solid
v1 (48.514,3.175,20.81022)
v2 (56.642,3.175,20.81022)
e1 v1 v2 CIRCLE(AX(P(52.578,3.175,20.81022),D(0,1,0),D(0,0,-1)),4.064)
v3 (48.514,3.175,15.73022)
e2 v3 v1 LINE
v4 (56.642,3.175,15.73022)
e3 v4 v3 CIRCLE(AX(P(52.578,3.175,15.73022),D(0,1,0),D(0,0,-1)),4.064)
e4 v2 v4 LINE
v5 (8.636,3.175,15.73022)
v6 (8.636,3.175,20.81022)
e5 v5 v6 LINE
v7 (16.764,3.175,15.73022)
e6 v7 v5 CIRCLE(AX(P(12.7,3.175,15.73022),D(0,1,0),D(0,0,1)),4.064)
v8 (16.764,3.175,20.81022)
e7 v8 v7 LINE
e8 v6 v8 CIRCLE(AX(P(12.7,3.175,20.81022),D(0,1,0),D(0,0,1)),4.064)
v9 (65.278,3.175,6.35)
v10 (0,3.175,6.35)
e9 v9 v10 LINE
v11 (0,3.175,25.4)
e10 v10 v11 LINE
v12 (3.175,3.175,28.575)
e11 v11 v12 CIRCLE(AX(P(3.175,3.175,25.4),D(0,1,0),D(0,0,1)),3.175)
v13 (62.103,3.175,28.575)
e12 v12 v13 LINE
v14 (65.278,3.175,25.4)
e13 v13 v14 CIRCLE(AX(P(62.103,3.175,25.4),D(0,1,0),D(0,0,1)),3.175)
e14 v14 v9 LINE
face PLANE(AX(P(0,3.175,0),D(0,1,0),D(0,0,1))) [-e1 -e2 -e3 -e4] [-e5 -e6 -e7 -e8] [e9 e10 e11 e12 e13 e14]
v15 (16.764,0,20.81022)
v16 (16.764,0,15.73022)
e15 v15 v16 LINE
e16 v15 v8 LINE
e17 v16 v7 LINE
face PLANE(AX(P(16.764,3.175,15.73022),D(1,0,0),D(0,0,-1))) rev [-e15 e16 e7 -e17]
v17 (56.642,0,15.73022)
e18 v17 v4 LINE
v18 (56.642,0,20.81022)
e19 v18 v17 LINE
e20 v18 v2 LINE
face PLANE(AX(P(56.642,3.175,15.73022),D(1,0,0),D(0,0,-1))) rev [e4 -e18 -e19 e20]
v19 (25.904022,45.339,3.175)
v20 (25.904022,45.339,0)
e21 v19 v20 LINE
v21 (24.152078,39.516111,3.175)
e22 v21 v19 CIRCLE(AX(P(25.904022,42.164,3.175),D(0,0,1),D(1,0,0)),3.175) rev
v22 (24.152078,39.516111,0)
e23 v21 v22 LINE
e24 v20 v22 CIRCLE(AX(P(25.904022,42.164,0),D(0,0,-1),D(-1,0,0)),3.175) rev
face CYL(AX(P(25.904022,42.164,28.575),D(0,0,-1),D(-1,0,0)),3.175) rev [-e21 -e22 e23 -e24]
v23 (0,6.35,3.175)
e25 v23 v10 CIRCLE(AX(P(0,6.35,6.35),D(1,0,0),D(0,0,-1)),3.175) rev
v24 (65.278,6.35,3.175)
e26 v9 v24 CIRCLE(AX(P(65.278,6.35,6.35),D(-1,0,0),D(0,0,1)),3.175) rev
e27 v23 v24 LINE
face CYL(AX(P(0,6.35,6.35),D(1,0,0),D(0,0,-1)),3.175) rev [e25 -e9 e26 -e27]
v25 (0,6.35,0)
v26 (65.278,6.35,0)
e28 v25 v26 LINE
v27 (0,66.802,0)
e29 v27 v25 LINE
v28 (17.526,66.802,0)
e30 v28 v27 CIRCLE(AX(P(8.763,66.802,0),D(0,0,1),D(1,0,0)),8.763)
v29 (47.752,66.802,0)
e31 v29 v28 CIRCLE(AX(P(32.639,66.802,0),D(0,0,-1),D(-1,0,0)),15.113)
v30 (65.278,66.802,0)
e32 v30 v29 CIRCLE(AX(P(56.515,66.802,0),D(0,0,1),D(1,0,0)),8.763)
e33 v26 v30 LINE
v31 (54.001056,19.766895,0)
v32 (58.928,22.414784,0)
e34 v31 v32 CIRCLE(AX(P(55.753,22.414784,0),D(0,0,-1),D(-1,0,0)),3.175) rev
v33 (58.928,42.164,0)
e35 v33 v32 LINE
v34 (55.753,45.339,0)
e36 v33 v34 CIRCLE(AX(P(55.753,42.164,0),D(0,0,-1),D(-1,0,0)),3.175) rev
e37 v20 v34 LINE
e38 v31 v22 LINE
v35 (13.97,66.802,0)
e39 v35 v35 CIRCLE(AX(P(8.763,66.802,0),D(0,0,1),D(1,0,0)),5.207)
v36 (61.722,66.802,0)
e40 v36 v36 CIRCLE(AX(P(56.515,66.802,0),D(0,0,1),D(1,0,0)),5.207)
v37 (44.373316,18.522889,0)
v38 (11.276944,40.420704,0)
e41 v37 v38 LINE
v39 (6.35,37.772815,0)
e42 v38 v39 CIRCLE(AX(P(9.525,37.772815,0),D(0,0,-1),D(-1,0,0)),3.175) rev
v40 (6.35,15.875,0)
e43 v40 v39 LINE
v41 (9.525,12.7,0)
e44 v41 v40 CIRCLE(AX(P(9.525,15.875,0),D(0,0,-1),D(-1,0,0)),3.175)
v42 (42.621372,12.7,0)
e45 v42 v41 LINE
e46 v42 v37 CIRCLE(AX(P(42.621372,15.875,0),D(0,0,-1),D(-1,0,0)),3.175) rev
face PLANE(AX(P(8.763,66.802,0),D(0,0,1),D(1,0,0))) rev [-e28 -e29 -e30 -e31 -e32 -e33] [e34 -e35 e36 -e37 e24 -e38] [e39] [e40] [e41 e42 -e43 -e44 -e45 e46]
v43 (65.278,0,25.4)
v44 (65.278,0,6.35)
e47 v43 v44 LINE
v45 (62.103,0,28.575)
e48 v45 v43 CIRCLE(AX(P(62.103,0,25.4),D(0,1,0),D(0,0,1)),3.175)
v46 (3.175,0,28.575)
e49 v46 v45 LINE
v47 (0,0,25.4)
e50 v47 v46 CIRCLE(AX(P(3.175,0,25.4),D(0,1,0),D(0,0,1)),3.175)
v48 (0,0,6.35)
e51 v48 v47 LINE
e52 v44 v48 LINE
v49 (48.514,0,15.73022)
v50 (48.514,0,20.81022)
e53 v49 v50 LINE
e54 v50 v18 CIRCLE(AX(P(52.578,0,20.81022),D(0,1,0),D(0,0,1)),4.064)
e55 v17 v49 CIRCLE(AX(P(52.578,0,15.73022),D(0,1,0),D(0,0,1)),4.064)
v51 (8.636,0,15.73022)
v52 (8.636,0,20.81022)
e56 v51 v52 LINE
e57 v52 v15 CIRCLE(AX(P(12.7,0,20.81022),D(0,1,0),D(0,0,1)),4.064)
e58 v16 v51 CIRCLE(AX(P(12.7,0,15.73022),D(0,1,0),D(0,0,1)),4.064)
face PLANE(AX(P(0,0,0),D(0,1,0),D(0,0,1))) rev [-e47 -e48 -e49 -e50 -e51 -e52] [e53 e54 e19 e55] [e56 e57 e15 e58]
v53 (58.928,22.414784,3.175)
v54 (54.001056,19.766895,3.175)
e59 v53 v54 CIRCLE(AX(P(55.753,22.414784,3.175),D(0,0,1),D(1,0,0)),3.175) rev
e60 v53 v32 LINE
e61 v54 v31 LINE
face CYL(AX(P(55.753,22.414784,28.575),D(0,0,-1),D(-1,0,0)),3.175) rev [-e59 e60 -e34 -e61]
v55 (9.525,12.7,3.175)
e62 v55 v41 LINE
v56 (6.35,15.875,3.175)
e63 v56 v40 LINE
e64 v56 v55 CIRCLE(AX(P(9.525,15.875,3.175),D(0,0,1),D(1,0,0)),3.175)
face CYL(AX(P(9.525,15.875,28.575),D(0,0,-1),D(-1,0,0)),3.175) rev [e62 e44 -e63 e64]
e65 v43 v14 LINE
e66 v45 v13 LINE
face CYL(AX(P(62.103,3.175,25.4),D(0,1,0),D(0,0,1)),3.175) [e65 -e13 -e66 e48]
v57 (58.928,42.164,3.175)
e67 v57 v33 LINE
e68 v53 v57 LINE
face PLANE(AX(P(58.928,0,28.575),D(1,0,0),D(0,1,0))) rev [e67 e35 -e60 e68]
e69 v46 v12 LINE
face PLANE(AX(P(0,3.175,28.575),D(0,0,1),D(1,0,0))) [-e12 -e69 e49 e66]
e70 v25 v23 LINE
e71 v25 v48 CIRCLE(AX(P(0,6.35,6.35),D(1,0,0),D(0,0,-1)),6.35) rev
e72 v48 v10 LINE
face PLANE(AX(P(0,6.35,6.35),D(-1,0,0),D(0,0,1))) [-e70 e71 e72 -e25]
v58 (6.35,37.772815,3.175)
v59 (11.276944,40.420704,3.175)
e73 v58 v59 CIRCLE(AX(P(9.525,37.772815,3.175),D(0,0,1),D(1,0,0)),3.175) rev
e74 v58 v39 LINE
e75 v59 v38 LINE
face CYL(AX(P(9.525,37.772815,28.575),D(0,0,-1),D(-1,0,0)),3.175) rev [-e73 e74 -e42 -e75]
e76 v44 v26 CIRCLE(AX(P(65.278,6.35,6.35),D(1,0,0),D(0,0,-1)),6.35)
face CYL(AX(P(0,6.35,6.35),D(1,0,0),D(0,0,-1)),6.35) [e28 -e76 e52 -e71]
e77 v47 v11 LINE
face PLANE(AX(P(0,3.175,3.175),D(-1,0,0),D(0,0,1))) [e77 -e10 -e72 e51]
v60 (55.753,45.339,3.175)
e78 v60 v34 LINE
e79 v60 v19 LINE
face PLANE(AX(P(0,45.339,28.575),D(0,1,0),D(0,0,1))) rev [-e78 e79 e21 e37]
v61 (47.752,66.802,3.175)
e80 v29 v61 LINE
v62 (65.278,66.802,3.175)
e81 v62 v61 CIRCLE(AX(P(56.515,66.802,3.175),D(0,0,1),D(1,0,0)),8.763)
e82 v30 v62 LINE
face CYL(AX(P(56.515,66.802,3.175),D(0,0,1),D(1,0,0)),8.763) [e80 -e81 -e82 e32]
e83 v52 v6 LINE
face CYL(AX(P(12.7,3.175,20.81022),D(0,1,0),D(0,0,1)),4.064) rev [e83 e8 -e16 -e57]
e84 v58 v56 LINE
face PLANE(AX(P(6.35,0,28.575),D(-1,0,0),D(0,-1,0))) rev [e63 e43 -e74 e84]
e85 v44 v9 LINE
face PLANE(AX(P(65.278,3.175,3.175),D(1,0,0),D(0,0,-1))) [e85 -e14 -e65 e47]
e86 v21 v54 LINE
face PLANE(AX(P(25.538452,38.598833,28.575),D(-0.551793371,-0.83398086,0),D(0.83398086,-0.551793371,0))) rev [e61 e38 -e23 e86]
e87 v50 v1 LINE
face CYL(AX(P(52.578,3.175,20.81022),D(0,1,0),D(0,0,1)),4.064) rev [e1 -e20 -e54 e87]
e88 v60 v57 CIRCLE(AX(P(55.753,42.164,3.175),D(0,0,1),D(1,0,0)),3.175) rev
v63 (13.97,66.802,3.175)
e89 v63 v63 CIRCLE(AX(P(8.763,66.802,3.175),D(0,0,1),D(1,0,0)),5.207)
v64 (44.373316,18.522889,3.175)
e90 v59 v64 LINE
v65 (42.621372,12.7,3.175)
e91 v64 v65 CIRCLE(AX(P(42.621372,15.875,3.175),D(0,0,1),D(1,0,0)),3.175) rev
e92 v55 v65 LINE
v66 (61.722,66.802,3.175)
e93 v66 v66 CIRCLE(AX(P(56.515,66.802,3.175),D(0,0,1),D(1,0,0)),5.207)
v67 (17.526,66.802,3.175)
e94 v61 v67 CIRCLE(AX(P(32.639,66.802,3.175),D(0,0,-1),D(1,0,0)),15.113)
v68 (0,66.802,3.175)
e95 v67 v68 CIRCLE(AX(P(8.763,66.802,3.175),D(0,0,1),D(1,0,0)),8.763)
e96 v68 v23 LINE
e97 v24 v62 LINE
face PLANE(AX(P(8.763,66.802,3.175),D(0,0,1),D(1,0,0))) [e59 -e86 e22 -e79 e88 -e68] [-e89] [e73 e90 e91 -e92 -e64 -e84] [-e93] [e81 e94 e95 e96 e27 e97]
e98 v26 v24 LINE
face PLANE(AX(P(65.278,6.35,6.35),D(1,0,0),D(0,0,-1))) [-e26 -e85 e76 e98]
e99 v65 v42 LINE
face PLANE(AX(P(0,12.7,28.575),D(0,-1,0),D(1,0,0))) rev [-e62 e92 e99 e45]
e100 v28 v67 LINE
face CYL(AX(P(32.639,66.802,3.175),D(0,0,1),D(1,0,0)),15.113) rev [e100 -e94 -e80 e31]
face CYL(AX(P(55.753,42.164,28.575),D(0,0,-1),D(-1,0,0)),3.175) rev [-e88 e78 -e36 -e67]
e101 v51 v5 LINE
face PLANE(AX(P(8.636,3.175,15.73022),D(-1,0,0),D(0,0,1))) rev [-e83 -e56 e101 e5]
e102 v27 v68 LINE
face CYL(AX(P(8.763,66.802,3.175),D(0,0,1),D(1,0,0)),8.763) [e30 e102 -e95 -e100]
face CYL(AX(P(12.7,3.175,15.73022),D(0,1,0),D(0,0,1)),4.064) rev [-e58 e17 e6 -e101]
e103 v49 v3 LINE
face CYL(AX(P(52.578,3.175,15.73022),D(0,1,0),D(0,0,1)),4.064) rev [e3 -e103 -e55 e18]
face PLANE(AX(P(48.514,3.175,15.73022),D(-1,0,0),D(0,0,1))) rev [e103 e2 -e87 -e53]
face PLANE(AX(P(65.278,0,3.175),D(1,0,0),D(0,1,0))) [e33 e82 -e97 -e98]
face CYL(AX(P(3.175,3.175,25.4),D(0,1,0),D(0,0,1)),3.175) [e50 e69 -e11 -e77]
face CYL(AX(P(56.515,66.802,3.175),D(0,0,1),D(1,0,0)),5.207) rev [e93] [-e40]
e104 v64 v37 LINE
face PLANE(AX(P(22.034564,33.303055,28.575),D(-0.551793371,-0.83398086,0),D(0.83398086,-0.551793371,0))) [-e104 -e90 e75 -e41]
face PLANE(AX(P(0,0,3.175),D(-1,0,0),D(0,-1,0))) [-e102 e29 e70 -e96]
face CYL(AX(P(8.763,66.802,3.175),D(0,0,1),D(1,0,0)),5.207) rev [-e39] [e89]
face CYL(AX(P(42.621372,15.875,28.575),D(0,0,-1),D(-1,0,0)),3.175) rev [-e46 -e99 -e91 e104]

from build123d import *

# Parameters (mm, degrees)
SKETCH1_R              = 5.207
BOSS_EXTRUDE1_DEPTH    = 3.175
SKETCH2_W              = 65.278
SKETCH2_H              = 25.4
BOSS_EXTRUDE2_DEPTH    = 3.175
FILLET1_R              = 3.175
CONVERT_SOLID1_DEPTH   = 65.278
CONVERT_SOLID1_2_DEPTH = 65.278
CUT_EXTRUDE1_DEPTH     = 104.864417073


# Read off the part's stored shape, not the designer's step: Convert-Solid1
with BuildPart() as part:
    # Sketch1 → Boss-Extrude1 (new body)
    with BuildSketch(Plane.XY):
        with BuildLine():
            Line((0, 0), (65.278, 0))
            Line((65.278, 0), (65.278, 66.802))
            ThreePointArc((65.278, 66.802), (56.515, 75.565), (47.752, 66.802))
            ThreePointArc((47.752, 66.802), (32.639, 51.689), (17.526, 66.802))
            ThreePointArc((17.526, 66.802), (8.763, 75.565), (0, 66.802))
            Line((0, 66.802), (0, 0))
        make_face()
        with Locations((8.763, 66.802)):
            Circle(SKETCH1_R, mode=Mode.SUBTRACT)
        with Locations((56.515, 66.802)):
            Circle(SKETCH1_R, mode=Mode.SUBTRACT)
    extrude(amount=BOSS_EXTRUDE1_DEPTH)

    # Sketch2 → Boss-Extrude2 (add)
    with BuildSketch(Plane(origin=(0, 0, 0), x_dir=(1, 0, 0), z_dir=(0, 1, 0))):
        with Locations((32.639, -15.875)):
            Rectangle(SKETCH2_W, SKETCH2_H)
        with BuildLine():
            Line((16.764, -15.73022), (16.764, -20.81022))
            ThreePointArc((16.764, -20.81022), (12.7, -24.87422), (8.636, -20.81022))
            Line((8.636, -20.81022), (8.636, -15.73022))
            ThreePointArc((8.636, -15.73022), (12.7, -11.66622), (16.764, -15.73022))
        make_face(mode=Mode.SUBTRACT)
        with BuildLine():
            Line((48.514, -15.73022), (48.514, -20.81022))
            ThreePointArc((48.514, -20.81022), (52.578, -24.87422), (56.642, -20.81022))
            Line((56.642, -20.81022), (56.642, -15.73022))
            ThreePointArc((56.642, -15.73022), (52.578, -11.66622), (48.514, -15.73022))
        make_face(mode=Mode.SUBTRACT)
    extrude(amount=BOSS_EXTRUDE2_DEPTH)

    # Fillet1
    fillet1_edges = [part.edges().sort_by_distance(p)[0] for p in [
        (0, 1.5875, 28.575),
        (65.278, 1.5875, 28.575),
    ]]
    fillet(fillet1_edges, radius=FILLET1_R)

    # Convert-Solid1 outline → Convert-Solid1 (cut)
    with BuildSketch(Plane.YZ):
        with BuildLine():
            ThreePointArc((6.35, 0), (1.859871939, 1.859871939), (0, 6.35))
            Line((0, 6.35), (0, 0))
            Line((0, 0), (6.35, 0))
        make_face()
    extrude(amount=CONVERT_SOLID1_DEPTH, mode=Mode.SUBTRACT)

    # Convert-Solid1 2 outline → Convert-Solid1 2 (add)
    with BuildSketch(Plane.YZ):
        with BuildLine():
            ThreePointArc((6.35, 3.175), (4.10493597, 4.10493597), (3.175, 6.35))
            Line((3.175, 6.35), (3.175, 3.175))
            Line((3.175, 3.175), (6.35, 3.175))
        make_face()
    extrude(amount=CONVERT_SOLID1_2_DEPTH)

    # Sketch3 → Cut-Extrude1 (cut, through all)
    with BuildSketch(Plane(origin=(0, 0, 0), x_dir=(-1, 0, 0), z_dir=(0, 0, -1))):
        with BuildLine():
            ThreePointArc((-54.001056047, 19.766894808), (-57.256030763, 19.618085357), (-58.928, 22.41478404))
            Line((-58.928, 22.41478404), (-58.928, 42.164))
            ThreePointArc((-58.928, 42.164), (-57.99806403, 44.40906403), (-55.753, 45.339))
            Line((-55.753, 45.339), (-25.904022132, 45.339))
            ThreePointArc((-25.904022132, 45.339), (-22.863654283, 43.078761359), (-24.152078179, 39.516110768))
            Line((-24.152078179, 39.516110768), (-54.001056047, 19.766894808))
        make_face()
        with BuildLine():
            ThreePointArc((-42.621372005, 12.7), (-45.661739854, 14.960238641), (-44.373315958, 18.522889232))
            Line((-44.373315958, 18.522889232), (-11.276943953, 40.42070433))
            ThreePointArc((-11.276943953, 40.42070433), (-8.021969237, 40.569513781), (-6.35, 37.772815098))
            Line((-6.35, 37.772815098), (-6.35, 15.875))
            ThreePointArc((-6.35, 15.875), (-7.27993597, 13.62993597), (-9.525, 12.7))
            Line((-9.525, 12.7), (-42.621372005, 12.7))
        make_face()
    extrude(amount=-CUT_EXTRUDE1_DEPTH, mode=Mode.SUBTRACT)


solid = part.part
